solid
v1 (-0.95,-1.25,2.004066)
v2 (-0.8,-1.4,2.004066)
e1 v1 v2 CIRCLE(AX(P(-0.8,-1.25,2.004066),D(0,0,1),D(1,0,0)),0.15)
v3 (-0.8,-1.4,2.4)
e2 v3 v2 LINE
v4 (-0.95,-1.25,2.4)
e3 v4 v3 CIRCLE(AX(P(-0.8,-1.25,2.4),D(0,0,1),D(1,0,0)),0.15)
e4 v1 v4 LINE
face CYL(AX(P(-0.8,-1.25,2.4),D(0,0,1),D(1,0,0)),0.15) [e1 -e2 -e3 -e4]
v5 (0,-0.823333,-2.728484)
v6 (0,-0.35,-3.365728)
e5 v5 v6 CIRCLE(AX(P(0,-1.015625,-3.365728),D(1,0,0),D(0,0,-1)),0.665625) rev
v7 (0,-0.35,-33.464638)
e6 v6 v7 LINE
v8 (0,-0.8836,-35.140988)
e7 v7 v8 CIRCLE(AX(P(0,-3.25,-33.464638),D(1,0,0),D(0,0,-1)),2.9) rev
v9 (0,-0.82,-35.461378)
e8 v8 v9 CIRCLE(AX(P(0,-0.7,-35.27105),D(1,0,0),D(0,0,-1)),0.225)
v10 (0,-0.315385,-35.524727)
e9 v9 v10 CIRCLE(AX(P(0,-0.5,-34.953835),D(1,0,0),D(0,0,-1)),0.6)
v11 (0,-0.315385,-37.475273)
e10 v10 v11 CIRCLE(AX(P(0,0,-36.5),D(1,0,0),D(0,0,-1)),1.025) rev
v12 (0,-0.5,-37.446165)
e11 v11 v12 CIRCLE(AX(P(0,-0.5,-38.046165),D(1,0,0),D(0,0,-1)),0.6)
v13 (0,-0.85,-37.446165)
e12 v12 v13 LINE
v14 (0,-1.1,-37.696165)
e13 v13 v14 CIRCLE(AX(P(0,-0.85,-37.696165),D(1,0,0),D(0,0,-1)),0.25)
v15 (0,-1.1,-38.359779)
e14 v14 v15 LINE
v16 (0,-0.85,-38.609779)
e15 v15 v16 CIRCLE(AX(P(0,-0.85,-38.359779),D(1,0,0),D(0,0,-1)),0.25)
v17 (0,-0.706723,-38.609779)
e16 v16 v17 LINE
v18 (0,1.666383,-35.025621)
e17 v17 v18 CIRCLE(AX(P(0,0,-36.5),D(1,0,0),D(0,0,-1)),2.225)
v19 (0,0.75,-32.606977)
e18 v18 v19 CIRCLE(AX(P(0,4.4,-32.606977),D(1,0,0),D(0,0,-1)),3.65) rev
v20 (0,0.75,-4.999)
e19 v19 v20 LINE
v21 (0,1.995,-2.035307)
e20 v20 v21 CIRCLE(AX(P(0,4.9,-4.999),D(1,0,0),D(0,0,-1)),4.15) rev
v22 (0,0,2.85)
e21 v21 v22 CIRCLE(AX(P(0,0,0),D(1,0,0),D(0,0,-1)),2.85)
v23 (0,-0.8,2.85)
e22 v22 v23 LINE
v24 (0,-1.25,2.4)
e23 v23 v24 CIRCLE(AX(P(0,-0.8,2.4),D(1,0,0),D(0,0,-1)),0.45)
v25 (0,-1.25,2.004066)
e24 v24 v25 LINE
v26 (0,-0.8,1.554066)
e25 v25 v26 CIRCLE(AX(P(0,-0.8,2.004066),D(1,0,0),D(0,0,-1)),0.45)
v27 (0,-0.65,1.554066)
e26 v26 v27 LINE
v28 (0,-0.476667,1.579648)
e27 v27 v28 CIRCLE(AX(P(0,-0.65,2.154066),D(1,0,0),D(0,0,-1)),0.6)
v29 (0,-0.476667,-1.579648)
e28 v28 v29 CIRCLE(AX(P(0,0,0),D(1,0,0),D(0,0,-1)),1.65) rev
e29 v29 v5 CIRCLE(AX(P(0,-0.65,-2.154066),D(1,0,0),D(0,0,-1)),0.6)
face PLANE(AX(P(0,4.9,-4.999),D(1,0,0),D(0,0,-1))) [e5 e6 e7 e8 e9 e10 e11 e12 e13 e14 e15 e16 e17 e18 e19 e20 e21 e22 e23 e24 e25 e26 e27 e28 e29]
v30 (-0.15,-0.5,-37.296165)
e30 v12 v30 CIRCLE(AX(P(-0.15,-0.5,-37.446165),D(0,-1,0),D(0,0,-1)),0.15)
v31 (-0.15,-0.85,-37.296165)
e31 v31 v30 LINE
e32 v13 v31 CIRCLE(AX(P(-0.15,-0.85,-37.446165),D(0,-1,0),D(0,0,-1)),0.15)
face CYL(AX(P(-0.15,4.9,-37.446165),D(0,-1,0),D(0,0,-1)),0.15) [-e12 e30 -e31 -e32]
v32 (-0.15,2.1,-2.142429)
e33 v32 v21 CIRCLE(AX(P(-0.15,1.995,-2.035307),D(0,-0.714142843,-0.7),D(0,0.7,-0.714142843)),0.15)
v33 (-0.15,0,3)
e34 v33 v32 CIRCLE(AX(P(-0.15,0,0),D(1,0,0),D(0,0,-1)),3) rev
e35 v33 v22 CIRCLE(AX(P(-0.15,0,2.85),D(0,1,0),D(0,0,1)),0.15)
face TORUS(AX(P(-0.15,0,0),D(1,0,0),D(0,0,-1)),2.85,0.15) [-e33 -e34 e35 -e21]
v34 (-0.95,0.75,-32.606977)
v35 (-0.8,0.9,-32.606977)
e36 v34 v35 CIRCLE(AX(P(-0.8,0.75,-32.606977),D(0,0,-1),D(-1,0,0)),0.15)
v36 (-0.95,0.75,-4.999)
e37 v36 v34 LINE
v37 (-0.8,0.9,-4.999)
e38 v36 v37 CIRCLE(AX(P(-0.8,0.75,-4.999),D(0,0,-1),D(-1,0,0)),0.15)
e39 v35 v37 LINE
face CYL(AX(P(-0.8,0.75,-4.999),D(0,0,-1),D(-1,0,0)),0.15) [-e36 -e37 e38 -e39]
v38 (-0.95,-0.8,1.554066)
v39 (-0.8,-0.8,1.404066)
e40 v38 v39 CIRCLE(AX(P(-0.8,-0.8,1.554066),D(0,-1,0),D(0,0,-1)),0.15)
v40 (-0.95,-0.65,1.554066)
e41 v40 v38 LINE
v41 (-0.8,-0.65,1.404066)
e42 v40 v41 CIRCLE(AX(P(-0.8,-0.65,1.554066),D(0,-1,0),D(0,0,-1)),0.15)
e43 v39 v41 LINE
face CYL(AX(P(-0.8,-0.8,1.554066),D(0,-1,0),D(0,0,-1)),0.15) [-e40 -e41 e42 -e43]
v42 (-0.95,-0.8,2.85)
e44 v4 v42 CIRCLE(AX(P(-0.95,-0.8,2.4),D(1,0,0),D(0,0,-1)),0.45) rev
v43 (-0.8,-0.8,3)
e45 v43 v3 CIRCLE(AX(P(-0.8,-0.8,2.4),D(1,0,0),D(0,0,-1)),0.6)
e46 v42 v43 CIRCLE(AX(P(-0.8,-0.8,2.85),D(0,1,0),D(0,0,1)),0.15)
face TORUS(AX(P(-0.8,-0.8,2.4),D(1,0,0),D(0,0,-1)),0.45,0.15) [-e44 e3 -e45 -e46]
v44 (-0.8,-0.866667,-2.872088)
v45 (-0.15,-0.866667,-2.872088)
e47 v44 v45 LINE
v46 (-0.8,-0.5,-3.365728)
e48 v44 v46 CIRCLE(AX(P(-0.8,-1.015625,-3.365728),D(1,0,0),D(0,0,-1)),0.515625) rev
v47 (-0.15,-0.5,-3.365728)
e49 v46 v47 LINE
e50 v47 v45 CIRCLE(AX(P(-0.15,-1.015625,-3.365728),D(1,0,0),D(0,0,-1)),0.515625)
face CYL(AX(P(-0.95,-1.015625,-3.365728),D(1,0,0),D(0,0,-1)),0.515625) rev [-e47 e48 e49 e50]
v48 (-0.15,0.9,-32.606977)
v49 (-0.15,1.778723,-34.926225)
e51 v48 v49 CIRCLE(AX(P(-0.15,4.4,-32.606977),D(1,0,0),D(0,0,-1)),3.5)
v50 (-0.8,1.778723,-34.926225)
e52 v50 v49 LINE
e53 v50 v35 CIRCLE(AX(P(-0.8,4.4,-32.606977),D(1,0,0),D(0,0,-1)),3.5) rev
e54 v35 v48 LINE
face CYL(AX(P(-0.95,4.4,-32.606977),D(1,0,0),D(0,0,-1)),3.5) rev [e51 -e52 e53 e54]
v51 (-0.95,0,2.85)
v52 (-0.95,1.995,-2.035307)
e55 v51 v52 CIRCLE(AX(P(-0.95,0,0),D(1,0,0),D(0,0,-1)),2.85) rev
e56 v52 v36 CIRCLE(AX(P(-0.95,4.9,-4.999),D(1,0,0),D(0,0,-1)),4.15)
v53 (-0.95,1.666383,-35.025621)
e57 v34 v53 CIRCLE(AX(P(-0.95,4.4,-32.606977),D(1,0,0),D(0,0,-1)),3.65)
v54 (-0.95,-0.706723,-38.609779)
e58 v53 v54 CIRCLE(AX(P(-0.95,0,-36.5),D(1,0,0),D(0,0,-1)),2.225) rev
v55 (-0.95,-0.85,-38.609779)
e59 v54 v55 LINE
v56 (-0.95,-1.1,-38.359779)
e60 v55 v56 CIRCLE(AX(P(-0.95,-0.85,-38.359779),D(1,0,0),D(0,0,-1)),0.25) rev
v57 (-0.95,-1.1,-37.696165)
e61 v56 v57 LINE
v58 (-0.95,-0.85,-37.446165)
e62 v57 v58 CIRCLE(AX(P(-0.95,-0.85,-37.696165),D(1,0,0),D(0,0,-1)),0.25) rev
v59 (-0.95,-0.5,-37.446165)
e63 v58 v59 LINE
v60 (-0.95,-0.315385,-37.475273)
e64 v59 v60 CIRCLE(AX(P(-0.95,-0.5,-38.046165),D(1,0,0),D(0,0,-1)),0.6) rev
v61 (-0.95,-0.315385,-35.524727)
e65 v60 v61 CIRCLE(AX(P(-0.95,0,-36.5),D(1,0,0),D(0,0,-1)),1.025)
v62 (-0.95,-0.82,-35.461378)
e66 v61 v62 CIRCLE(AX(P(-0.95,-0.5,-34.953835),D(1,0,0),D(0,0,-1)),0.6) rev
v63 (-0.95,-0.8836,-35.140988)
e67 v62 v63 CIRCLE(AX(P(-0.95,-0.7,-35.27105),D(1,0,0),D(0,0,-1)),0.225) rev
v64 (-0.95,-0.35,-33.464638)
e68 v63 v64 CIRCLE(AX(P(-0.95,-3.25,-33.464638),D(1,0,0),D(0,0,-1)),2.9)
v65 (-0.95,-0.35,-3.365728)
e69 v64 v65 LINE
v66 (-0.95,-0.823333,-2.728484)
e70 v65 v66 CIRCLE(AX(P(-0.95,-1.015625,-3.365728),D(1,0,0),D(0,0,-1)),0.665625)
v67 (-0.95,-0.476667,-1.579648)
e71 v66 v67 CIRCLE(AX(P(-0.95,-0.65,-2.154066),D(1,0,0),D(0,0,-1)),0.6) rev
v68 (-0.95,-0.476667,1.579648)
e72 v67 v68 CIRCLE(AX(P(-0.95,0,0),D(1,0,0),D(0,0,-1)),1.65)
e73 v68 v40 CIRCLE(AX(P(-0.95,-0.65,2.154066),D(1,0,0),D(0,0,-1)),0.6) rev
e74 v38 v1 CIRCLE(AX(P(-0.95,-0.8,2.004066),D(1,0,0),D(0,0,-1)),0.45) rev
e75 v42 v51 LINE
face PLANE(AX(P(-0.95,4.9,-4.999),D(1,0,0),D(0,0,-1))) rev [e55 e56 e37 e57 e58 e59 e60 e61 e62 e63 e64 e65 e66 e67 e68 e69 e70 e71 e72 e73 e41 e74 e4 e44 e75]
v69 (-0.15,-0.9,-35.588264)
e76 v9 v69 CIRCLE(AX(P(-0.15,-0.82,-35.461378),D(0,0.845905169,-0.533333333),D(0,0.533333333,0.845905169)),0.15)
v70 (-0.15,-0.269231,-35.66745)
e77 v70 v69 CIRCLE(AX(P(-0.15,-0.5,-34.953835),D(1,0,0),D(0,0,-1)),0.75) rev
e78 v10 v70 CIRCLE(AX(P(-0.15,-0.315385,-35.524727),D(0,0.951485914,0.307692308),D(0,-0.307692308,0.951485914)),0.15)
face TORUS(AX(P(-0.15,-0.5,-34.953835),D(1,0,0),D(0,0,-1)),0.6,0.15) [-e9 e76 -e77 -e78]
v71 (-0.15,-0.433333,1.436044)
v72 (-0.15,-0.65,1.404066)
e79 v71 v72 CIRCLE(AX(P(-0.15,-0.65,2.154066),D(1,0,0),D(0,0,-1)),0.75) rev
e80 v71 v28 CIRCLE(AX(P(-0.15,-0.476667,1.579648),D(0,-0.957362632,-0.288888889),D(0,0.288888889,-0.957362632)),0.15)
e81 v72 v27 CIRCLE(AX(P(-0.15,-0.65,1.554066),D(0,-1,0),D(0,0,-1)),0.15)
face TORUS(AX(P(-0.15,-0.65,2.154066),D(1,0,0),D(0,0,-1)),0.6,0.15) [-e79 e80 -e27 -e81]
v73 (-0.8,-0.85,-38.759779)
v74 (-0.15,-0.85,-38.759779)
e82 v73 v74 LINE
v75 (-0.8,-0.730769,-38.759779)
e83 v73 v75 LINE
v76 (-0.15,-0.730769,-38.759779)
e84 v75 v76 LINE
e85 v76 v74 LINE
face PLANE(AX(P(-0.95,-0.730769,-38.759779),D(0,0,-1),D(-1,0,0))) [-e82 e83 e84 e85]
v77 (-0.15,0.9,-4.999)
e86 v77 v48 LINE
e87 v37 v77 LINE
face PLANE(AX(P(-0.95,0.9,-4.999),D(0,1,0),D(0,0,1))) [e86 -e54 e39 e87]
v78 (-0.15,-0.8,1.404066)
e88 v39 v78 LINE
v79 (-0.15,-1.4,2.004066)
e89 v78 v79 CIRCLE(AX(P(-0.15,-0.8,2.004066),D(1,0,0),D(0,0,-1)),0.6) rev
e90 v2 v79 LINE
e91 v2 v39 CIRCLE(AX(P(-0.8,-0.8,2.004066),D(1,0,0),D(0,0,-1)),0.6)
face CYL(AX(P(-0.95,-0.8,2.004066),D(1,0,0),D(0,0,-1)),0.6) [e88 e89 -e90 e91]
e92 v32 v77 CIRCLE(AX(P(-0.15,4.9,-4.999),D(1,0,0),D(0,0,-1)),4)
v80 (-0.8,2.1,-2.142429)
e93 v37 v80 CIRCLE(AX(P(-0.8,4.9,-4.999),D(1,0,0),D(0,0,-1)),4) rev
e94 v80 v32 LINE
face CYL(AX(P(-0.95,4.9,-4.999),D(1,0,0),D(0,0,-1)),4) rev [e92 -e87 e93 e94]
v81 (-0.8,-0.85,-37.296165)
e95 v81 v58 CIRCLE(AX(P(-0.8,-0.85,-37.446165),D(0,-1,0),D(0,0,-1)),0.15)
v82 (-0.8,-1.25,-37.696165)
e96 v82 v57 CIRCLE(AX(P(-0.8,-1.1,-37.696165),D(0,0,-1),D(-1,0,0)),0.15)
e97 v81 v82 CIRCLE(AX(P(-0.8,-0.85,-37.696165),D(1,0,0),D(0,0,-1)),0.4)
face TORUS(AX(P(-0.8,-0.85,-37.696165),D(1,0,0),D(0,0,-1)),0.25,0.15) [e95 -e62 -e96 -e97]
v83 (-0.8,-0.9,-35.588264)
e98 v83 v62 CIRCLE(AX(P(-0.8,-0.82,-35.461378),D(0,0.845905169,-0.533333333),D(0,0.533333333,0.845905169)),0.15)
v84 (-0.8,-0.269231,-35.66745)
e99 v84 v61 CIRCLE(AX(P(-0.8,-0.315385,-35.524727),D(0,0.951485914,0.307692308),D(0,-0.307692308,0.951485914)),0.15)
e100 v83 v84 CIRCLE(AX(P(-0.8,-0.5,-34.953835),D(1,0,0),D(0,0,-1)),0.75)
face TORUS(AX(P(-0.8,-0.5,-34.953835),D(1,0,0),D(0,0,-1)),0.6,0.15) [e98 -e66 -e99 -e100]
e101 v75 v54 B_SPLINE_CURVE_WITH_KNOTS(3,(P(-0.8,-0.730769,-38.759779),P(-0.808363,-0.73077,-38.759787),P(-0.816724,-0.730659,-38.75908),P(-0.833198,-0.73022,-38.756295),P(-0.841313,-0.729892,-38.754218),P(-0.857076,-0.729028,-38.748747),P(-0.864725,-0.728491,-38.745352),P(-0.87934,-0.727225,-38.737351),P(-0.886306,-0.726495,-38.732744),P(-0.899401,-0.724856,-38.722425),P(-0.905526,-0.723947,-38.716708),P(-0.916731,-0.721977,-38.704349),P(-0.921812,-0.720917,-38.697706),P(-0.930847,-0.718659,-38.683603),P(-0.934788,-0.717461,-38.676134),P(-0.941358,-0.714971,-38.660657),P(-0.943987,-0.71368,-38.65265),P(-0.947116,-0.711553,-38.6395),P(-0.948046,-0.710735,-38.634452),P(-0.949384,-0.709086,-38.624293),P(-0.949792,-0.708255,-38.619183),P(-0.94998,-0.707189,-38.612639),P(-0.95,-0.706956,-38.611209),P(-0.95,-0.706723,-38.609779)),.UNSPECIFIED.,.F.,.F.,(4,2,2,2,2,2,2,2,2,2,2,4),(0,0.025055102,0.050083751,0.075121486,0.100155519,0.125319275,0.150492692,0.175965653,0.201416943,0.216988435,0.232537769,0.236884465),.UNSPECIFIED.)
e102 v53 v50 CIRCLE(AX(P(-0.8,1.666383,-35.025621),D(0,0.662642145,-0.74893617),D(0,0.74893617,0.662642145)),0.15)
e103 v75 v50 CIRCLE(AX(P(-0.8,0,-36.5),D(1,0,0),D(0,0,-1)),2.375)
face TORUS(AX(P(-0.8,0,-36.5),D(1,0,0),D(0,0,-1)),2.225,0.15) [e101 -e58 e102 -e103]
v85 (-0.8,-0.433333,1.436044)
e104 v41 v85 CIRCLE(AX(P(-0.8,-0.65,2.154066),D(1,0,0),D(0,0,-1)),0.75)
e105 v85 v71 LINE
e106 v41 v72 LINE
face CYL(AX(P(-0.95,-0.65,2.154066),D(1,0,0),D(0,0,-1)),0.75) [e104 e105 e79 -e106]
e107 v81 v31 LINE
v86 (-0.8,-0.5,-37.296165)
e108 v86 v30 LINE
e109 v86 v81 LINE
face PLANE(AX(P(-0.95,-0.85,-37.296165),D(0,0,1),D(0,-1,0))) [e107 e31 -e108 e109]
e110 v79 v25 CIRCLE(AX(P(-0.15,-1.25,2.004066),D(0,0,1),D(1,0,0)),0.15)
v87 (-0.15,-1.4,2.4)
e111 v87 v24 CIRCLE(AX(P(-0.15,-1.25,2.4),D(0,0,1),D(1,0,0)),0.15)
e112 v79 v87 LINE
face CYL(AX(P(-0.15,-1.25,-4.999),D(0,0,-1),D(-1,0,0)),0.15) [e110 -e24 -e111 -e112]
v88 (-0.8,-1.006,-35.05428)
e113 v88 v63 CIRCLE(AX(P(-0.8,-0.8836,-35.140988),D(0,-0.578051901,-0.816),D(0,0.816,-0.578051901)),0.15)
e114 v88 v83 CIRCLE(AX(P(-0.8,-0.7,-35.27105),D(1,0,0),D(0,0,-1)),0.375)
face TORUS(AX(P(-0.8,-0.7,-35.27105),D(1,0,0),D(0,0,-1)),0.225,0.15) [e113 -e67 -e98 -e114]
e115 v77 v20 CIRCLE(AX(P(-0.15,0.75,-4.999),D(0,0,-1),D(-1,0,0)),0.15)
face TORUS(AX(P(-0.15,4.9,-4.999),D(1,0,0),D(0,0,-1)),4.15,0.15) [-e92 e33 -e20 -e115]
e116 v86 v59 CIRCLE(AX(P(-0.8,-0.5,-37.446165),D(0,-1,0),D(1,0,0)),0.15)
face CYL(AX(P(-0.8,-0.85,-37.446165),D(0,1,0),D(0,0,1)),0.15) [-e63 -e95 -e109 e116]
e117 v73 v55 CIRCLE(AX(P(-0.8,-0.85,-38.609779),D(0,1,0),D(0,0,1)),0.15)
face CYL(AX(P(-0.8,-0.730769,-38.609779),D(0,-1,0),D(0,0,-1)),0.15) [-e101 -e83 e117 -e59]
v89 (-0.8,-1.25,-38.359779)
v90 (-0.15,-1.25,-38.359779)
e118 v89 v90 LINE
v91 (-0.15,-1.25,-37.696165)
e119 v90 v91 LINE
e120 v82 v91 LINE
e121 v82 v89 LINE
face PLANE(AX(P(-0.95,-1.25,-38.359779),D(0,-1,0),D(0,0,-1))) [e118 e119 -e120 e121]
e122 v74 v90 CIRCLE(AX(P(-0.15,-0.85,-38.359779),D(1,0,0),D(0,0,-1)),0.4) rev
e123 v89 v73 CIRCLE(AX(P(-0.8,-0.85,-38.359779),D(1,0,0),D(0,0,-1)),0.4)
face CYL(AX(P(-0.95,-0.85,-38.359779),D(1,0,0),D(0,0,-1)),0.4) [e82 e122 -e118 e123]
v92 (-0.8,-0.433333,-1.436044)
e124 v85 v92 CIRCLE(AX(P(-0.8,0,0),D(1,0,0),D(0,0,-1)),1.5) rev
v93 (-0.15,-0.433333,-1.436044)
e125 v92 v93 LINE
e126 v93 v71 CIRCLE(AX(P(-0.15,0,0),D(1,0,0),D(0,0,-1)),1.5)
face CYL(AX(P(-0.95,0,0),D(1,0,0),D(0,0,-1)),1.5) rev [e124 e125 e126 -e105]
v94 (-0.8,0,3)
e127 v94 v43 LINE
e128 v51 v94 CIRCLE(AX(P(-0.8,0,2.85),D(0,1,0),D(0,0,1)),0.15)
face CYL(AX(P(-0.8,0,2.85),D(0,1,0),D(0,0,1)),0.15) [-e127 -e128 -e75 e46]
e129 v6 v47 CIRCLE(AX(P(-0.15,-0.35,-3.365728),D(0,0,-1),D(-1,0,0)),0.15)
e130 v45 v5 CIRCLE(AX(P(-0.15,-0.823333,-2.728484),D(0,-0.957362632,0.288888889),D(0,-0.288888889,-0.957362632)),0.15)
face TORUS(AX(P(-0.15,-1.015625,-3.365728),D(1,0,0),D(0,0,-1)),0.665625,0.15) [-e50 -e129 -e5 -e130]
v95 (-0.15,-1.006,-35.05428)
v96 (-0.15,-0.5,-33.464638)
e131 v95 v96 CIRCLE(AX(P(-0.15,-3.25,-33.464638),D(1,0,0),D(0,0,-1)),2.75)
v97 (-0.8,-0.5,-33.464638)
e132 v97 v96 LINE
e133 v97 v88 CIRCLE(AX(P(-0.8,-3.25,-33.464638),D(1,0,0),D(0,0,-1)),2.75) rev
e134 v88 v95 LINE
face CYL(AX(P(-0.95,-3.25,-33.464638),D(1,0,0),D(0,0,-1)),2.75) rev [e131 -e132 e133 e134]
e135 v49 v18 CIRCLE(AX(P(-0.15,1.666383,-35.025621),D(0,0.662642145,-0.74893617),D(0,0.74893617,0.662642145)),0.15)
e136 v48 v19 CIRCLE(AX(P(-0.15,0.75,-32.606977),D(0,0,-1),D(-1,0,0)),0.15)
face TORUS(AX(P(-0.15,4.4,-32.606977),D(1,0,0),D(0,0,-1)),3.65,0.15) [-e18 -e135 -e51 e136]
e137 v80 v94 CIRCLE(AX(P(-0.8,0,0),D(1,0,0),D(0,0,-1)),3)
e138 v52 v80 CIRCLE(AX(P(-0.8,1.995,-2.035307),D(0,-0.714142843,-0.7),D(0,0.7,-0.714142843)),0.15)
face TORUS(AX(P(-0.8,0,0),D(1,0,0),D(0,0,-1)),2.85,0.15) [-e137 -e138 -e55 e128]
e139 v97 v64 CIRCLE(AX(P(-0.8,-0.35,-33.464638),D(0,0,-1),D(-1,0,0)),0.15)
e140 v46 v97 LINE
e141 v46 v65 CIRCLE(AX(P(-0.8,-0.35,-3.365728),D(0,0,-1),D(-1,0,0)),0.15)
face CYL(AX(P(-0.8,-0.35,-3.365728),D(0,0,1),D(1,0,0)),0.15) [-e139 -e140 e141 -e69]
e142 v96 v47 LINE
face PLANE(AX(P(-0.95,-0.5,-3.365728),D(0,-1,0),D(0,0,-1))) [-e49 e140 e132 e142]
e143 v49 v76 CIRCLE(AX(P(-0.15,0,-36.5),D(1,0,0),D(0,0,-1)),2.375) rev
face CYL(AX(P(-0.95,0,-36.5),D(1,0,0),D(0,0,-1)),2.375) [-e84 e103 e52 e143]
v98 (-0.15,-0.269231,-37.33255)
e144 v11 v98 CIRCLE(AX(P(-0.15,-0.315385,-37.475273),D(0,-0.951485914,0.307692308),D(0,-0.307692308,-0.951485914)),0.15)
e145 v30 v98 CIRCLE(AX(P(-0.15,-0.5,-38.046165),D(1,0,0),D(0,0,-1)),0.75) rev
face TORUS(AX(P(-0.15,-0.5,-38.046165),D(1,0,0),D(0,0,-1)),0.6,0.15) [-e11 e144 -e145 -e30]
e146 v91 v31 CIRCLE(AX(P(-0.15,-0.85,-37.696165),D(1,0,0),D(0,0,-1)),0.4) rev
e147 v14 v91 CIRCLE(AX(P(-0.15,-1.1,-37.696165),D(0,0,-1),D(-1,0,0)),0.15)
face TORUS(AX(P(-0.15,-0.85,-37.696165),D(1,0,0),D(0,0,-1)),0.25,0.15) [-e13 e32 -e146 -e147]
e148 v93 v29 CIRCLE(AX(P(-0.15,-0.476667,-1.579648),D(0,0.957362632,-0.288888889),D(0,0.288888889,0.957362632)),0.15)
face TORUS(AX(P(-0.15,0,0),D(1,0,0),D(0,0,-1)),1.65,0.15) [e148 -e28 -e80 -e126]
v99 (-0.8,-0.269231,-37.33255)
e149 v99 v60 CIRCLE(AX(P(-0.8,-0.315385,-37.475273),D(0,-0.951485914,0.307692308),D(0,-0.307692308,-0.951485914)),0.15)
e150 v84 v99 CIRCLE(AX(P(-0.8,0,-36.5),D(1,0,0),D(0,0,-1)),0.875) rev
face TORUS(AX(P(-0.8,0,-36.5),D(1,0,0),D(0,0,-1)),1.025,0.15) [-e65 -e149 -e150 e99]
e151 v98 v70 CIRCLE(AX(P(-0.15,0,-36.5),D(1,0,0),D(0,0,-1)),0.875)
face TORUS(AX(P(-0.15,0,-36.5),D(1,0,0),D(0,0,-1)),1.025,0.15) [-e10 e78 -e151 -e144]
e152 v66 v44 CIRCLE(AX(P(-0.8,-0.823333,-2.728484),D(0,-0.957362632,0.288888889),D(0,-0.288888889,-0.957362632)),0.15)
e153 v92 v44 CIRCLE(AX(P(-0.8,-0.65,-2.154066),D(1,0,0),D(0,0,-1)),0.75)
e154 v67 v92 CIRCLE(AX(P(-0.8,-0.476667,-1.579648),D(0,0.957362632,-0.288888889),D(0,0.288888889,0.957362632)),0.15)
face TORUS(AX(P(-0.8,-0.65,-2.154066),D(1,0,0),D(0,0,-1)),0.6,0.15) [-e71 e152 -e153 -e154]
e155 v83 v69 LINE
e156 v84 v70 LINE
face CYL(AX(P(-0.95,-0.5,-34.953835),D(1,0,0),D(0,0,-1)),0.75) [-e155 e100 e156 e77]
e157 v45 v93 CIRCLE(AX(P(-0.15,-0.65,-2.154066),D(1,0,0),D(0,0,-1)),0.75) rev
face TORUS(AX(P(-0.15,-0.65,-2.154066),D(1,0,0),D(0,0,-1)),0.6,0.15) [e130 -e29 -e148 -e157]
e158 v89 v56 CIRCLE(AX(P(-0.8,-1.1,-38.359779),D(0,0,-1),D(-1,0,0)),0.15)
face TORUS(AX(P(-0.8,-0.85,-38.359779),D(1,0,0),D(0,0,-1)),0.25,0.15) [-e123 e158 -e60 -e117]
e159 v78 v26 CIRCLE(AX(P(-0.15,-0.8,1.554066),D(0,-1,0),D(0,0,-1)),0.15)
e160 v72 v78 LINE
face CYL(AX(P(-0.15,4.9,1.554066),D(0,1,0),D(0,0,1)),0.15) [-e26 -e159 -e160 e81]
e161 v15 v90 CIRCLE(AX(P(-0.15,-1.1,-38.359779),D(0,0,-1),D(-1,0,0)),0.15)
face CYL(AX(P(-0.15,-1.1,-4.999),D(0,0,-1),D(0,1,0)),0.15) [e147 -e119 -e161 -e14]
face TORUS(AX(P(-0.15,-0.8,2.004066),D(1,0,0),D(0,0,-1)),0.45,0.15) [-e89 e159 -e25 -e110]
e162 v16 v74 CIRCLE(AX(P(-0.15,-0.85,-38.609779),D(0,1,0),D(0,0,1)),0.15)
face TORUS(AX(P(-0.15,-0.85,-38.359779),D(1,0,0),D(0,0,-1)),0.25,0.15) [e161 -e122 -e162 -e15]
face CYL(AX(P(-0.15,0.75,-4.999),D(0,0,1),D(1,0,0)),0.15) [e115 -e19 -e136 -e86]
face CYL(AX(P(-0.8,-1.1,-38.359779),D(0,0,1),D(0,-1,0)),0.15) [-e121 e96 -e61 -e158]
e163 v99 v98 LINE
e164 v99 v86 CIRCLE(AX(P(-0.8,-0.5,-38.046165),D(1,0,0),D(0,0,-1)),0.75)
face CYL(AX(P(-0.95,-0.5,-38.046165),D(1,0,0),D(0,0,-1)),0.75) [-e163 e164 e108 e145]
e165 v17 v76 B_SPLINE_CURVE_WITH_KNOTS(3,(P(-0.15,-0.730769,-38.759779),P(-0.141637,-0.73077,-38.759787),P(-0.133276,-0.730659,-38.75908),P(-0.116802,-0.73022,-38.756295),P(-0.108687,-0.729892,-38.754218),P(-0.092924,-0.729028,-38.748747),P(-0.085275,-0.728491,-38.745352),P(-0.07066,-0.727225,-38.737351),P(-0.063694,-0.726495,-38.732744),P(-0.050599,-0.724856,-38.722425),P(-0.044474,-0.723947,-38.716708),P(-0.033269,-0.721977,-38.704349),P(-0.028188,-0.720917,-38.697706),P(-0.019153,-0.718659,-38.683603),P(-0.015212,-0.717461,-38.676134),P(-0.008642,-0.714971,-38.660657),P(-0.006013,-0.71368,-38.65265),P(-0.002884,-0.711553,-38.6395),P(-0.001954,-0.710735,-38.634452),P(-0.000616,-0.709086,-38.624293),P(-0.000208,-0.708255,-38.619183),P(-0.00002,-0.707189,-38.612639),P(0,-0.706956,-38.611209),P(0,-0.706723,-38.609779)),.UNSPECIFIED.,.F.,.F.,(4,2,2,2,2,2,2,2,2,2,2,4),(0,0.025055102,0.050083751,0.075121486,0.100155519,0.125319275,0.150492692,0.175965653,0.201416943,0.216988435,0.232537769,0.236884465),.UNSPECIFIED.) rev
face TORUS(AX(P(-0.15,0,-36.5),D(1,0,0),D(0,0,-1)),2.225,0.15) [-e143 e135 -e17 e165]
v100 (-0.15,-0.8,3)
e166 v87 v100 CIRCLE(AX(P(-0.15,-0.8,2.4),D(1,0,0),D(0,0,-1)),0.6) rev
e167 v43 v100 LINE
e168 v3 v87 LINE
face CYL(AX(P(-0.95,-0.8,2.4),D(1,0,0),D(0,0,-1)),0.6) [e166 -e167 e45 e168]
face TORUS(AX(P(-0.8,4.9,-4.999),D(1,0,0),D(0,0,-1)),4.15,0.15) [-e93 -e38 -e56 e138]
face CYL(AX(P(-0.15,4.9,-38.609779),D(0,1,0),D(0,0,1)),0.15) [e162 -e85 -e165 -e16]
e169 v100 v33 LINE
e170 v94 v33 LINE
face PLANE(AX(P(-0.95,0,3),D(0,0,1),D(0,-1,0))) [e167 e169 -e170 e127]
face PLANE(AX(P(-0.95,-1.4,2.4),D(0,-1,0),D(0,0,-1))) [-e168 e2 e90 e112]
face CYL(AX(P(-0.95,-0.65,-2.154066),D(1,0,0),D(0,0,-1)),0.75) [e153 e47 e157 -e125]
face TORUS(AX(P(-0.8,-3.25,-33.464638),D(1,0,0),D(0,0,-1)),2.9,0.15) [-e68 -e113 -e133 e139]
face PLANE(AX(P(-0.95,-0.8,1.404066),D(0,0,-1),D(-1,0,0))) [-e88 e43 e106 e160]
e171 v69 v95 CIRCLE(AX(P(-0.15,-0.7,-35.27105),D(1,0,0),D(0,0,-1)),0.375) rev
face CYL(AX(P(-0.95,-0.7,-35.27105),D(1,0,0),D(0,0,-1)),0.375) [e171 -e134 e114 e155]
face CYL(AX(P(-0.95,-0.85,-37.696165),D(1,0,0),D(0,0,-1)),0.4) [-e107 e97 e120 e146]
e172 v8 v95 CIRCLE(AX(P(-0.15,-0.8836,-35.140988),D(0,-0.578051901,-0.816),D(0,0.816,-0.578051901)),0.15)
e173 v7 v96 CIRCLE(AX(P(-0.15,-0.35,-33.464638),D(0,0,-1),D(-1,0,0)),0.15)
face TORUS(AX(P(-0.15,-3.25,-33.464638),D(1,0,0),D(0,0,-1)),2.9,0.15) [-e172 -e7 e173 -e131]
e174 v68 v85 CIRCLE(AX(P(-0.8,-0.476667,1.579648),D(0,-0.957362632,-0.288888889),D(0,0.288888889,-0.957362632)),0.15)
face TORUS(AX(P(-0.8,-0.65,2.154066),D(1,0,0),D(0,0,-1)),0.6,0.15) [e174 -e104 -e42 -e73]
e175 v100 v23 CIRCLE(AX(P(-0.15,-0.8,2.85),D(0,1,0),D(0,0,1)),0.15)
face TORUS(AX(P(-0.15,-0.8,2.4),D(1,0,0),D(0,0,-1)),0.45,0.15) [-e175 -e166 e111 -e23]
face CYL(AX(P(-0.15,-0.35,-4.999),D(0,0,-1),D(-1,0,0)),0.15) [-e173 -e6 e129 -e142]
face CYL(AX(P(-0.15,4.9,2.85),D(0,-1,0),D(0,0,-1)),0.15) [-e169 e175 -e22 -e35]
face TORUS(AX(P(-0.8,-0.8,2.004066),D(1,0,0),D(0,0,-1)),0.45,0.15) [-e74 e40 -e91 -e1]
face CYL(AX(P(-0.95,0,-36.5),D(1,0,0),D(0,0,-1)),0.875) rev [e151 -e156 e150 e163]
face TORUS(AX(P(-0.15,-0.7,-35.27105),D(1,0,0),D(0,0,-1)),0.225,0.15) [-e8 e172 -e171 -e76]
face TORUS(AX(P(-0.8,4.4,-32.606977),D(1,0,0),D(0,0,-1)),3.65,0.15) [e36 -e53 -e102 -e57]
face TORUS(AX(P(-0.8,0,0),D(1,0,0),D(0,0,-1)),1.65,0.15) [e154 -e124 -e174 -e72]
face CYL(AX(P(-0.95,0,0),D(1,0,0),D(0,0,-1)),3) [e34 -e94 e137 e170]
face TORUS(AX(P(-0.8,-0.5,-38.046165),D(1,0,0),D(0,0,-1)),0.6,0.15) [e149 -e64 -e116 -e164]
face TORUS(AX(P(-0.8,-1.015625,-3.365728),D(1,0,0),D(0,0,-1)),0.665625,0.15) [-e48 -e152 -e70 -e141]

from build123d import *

# Parameters (mm, degrees)
BASE_FLANGE1_DEPTH = 0.95
FILLET1_R          = 0.15


# Sheet-metal steps are written as plain solids
with BuildPart() as part:
    # Sketch1 → Base-Flange1 (new body)
    with BuildSketch(Plane(origin=(0, 0, 0), x_dir=(0, 0, -1), z_dir=(1, 0, 0))):
        with BuildLine():
            Line((4.9989999, 0.9), (32.606977395, 0.9))
            ThreePointArc((32.606977395, 0.9), (33.847044312, 1.127045059), (34.926224905, 1.778723404))
            ThreePointArc((34.926224905, 1.778723404), (37.80078387, 1.987105011), (38.759779045, -0.730769231))
            Line((38.759779045, -0.730769231), (38.759779045, -0.85))
            ThreePointArc((38.759779045, -0.85), (38.642621757, -1.132842712), (38.359779045, -1.25))
            Line((38.359779045, -1.25), (37.69616461, -1.25))
            ThreePointArc((37.69616461, -1.25), (37.413321897, -1.132842712), (37.29616461, -0.85))
            Line((37.29616461, -0.85), (37.29616461, -0.5))
            ThreePointArc((37.29616461, -0.5), (37.305316843, -0.383189954), (37.332550174, -0.269230769))
            ThreePointArc((37.332550174, -0.269230769), (36.5, 0.875), (35.667449826, -0.269230769))
            ThreePointArc((35.667449826, -0.269230769), (35.697994411, -0.593420295), (35.588264267, -0.9))
            ThreePointArc((35.588264267, -0.9), (35.344065569, -1.067822922), (35.054280366, -1.006))
            ThreePointArc((35.054280366, -1.006), (34.298753938, -0.629551565), (33.464637639, -0.5))
            Line((33.464637639, -0.5), (3.365728004, -0.5))
            ThreePointArc((3.365728004, -0.5), (3.058268658, -0.601695186), (2.872087897, -0.866666667))
            ThreePointArc((2.872087897, -0.866666667), (1.937399256, -1.368021974), (1.436043949, -0.433333333))
            ThreePointArc((1.436043949, -0.433333333), (0, 1.5), (-1.436043949, -0.433333333))
            ThreePointArc((-1.436043949, -0.433333333), (-1.412103498, -0.540493107), (-1.404065923, -0.65))
            Line((-1.404065923, -0.65), (-1.404065923, -0.8))
            ThreePointArc((-1.404065923, -0.8), (-1.579801854, -1.224264069), (-2.004065923, -1.4))
            Line((-2.004065923, -1.4), (-2.4, -1.4))
            ThreePointArc((-2.4, -1.4), (-2.824264069, -1.224264069), (-3, -0.8))
            Line((-3, -0.8), (-3, 0))
            ThreePointArc((-3, 0), (-1.134176885, 2.777344558), (2.142428529, 2.1))
            ThreePointArc((2.142428529, 2.1), (3.449806561, 1.212182217), (4.9989999, 0.9))
        make_face()
    extrude(amount=-BASE_FLANGE1_DEPTH)

    # Fillet1
    fillet1_edges = [part.edges().sort_by_distance(p)[0] for p in [
        (-0.95, 1.987105011, -37.80078387),
        (-0.95, 1.127045059, -33.847044312),
        (-0.95, -0.790384615, -38.759779045),
        (-0.95, -1.132842712, -38.642621757),
        (-0.95, -1.25, -38.027971827),
        (-0.95, -1.132842712, -37.413321897),
        (-0.95, -0.675, -37.29616461),
        (-0.95, -0.383189954, -37.305316843),
        (-0.95, 0.875, -36.5),
        (-0.95, -0.593420295, -35.697994411),
        (-0.95, -1.067822922, -35.344065569),
        (-0.95, -0.629551565, -34.298753938),
        (-0.95, -0.5, -18.415182822),
        (-0.95, -0.601695186, -3.058268658),
        (-0.95, -1.368021974, -1.937399256),
        (-0.95, 1.5, 0),
        (-0.95, -0.540493107, 1.412103498),
        (-0.95, -0.725, 1.404065923),
        (-0.95, -1.224264069, 1.579801854),
        (-0.95, -1.4, 2.202032961),
        (-0.95, -1.224264069, 2.824264069),
        (-0.95, -0.4, 3),
        (-0.95, 2.777344558, 1.134176885),
        (-0.95, 1.212182217, -3.449806561),
        (0, 1.987105011, -37.80078387),
        (0, 1.127045059, -33.847044312),
        (0, -0.790384615, -38.759779045),
        (0, -1.132842712, -38.642621757),
        (0, -1.25, -38.027971827),
        (0, -1.132842712, -37.413321897),
        (0, -0.675, -37.29616461),
        (0, -0.383189954, -37.305316843),
        (0, 0.875, -36.5),
        (0, -0.593420295, -35.697994411),
        (0, -1.067822922, -35.344065569),
        (0, -0.629551565, -34.298753938),
        (0, -0.5, -18.415182822),
        (0, -0.601695186, -3.058268658),
        (0, -1.368021974, -1.937399256),
        (0, 1.5, 0),
        (0, -0.540493107, 1.412103498),
        (0, -0.725, 1.404065923),
        (0, -1.224264069, 1.579801854),
        (0, -1.4, 2.202032961),
        (0, -1.224264069, 2.824264069),
        (0, -0.4, 3),
        (0, 2.777344558, 1.134176885),
        (0, 1.212182217, -3.449806561),
        (-0.95, 0.9, -18.802988648),
        (0, 0.9, -18.802988648),
    ]]
    fillet(fillet1_edges, radius=FILLET1_R)


solid = part.part
